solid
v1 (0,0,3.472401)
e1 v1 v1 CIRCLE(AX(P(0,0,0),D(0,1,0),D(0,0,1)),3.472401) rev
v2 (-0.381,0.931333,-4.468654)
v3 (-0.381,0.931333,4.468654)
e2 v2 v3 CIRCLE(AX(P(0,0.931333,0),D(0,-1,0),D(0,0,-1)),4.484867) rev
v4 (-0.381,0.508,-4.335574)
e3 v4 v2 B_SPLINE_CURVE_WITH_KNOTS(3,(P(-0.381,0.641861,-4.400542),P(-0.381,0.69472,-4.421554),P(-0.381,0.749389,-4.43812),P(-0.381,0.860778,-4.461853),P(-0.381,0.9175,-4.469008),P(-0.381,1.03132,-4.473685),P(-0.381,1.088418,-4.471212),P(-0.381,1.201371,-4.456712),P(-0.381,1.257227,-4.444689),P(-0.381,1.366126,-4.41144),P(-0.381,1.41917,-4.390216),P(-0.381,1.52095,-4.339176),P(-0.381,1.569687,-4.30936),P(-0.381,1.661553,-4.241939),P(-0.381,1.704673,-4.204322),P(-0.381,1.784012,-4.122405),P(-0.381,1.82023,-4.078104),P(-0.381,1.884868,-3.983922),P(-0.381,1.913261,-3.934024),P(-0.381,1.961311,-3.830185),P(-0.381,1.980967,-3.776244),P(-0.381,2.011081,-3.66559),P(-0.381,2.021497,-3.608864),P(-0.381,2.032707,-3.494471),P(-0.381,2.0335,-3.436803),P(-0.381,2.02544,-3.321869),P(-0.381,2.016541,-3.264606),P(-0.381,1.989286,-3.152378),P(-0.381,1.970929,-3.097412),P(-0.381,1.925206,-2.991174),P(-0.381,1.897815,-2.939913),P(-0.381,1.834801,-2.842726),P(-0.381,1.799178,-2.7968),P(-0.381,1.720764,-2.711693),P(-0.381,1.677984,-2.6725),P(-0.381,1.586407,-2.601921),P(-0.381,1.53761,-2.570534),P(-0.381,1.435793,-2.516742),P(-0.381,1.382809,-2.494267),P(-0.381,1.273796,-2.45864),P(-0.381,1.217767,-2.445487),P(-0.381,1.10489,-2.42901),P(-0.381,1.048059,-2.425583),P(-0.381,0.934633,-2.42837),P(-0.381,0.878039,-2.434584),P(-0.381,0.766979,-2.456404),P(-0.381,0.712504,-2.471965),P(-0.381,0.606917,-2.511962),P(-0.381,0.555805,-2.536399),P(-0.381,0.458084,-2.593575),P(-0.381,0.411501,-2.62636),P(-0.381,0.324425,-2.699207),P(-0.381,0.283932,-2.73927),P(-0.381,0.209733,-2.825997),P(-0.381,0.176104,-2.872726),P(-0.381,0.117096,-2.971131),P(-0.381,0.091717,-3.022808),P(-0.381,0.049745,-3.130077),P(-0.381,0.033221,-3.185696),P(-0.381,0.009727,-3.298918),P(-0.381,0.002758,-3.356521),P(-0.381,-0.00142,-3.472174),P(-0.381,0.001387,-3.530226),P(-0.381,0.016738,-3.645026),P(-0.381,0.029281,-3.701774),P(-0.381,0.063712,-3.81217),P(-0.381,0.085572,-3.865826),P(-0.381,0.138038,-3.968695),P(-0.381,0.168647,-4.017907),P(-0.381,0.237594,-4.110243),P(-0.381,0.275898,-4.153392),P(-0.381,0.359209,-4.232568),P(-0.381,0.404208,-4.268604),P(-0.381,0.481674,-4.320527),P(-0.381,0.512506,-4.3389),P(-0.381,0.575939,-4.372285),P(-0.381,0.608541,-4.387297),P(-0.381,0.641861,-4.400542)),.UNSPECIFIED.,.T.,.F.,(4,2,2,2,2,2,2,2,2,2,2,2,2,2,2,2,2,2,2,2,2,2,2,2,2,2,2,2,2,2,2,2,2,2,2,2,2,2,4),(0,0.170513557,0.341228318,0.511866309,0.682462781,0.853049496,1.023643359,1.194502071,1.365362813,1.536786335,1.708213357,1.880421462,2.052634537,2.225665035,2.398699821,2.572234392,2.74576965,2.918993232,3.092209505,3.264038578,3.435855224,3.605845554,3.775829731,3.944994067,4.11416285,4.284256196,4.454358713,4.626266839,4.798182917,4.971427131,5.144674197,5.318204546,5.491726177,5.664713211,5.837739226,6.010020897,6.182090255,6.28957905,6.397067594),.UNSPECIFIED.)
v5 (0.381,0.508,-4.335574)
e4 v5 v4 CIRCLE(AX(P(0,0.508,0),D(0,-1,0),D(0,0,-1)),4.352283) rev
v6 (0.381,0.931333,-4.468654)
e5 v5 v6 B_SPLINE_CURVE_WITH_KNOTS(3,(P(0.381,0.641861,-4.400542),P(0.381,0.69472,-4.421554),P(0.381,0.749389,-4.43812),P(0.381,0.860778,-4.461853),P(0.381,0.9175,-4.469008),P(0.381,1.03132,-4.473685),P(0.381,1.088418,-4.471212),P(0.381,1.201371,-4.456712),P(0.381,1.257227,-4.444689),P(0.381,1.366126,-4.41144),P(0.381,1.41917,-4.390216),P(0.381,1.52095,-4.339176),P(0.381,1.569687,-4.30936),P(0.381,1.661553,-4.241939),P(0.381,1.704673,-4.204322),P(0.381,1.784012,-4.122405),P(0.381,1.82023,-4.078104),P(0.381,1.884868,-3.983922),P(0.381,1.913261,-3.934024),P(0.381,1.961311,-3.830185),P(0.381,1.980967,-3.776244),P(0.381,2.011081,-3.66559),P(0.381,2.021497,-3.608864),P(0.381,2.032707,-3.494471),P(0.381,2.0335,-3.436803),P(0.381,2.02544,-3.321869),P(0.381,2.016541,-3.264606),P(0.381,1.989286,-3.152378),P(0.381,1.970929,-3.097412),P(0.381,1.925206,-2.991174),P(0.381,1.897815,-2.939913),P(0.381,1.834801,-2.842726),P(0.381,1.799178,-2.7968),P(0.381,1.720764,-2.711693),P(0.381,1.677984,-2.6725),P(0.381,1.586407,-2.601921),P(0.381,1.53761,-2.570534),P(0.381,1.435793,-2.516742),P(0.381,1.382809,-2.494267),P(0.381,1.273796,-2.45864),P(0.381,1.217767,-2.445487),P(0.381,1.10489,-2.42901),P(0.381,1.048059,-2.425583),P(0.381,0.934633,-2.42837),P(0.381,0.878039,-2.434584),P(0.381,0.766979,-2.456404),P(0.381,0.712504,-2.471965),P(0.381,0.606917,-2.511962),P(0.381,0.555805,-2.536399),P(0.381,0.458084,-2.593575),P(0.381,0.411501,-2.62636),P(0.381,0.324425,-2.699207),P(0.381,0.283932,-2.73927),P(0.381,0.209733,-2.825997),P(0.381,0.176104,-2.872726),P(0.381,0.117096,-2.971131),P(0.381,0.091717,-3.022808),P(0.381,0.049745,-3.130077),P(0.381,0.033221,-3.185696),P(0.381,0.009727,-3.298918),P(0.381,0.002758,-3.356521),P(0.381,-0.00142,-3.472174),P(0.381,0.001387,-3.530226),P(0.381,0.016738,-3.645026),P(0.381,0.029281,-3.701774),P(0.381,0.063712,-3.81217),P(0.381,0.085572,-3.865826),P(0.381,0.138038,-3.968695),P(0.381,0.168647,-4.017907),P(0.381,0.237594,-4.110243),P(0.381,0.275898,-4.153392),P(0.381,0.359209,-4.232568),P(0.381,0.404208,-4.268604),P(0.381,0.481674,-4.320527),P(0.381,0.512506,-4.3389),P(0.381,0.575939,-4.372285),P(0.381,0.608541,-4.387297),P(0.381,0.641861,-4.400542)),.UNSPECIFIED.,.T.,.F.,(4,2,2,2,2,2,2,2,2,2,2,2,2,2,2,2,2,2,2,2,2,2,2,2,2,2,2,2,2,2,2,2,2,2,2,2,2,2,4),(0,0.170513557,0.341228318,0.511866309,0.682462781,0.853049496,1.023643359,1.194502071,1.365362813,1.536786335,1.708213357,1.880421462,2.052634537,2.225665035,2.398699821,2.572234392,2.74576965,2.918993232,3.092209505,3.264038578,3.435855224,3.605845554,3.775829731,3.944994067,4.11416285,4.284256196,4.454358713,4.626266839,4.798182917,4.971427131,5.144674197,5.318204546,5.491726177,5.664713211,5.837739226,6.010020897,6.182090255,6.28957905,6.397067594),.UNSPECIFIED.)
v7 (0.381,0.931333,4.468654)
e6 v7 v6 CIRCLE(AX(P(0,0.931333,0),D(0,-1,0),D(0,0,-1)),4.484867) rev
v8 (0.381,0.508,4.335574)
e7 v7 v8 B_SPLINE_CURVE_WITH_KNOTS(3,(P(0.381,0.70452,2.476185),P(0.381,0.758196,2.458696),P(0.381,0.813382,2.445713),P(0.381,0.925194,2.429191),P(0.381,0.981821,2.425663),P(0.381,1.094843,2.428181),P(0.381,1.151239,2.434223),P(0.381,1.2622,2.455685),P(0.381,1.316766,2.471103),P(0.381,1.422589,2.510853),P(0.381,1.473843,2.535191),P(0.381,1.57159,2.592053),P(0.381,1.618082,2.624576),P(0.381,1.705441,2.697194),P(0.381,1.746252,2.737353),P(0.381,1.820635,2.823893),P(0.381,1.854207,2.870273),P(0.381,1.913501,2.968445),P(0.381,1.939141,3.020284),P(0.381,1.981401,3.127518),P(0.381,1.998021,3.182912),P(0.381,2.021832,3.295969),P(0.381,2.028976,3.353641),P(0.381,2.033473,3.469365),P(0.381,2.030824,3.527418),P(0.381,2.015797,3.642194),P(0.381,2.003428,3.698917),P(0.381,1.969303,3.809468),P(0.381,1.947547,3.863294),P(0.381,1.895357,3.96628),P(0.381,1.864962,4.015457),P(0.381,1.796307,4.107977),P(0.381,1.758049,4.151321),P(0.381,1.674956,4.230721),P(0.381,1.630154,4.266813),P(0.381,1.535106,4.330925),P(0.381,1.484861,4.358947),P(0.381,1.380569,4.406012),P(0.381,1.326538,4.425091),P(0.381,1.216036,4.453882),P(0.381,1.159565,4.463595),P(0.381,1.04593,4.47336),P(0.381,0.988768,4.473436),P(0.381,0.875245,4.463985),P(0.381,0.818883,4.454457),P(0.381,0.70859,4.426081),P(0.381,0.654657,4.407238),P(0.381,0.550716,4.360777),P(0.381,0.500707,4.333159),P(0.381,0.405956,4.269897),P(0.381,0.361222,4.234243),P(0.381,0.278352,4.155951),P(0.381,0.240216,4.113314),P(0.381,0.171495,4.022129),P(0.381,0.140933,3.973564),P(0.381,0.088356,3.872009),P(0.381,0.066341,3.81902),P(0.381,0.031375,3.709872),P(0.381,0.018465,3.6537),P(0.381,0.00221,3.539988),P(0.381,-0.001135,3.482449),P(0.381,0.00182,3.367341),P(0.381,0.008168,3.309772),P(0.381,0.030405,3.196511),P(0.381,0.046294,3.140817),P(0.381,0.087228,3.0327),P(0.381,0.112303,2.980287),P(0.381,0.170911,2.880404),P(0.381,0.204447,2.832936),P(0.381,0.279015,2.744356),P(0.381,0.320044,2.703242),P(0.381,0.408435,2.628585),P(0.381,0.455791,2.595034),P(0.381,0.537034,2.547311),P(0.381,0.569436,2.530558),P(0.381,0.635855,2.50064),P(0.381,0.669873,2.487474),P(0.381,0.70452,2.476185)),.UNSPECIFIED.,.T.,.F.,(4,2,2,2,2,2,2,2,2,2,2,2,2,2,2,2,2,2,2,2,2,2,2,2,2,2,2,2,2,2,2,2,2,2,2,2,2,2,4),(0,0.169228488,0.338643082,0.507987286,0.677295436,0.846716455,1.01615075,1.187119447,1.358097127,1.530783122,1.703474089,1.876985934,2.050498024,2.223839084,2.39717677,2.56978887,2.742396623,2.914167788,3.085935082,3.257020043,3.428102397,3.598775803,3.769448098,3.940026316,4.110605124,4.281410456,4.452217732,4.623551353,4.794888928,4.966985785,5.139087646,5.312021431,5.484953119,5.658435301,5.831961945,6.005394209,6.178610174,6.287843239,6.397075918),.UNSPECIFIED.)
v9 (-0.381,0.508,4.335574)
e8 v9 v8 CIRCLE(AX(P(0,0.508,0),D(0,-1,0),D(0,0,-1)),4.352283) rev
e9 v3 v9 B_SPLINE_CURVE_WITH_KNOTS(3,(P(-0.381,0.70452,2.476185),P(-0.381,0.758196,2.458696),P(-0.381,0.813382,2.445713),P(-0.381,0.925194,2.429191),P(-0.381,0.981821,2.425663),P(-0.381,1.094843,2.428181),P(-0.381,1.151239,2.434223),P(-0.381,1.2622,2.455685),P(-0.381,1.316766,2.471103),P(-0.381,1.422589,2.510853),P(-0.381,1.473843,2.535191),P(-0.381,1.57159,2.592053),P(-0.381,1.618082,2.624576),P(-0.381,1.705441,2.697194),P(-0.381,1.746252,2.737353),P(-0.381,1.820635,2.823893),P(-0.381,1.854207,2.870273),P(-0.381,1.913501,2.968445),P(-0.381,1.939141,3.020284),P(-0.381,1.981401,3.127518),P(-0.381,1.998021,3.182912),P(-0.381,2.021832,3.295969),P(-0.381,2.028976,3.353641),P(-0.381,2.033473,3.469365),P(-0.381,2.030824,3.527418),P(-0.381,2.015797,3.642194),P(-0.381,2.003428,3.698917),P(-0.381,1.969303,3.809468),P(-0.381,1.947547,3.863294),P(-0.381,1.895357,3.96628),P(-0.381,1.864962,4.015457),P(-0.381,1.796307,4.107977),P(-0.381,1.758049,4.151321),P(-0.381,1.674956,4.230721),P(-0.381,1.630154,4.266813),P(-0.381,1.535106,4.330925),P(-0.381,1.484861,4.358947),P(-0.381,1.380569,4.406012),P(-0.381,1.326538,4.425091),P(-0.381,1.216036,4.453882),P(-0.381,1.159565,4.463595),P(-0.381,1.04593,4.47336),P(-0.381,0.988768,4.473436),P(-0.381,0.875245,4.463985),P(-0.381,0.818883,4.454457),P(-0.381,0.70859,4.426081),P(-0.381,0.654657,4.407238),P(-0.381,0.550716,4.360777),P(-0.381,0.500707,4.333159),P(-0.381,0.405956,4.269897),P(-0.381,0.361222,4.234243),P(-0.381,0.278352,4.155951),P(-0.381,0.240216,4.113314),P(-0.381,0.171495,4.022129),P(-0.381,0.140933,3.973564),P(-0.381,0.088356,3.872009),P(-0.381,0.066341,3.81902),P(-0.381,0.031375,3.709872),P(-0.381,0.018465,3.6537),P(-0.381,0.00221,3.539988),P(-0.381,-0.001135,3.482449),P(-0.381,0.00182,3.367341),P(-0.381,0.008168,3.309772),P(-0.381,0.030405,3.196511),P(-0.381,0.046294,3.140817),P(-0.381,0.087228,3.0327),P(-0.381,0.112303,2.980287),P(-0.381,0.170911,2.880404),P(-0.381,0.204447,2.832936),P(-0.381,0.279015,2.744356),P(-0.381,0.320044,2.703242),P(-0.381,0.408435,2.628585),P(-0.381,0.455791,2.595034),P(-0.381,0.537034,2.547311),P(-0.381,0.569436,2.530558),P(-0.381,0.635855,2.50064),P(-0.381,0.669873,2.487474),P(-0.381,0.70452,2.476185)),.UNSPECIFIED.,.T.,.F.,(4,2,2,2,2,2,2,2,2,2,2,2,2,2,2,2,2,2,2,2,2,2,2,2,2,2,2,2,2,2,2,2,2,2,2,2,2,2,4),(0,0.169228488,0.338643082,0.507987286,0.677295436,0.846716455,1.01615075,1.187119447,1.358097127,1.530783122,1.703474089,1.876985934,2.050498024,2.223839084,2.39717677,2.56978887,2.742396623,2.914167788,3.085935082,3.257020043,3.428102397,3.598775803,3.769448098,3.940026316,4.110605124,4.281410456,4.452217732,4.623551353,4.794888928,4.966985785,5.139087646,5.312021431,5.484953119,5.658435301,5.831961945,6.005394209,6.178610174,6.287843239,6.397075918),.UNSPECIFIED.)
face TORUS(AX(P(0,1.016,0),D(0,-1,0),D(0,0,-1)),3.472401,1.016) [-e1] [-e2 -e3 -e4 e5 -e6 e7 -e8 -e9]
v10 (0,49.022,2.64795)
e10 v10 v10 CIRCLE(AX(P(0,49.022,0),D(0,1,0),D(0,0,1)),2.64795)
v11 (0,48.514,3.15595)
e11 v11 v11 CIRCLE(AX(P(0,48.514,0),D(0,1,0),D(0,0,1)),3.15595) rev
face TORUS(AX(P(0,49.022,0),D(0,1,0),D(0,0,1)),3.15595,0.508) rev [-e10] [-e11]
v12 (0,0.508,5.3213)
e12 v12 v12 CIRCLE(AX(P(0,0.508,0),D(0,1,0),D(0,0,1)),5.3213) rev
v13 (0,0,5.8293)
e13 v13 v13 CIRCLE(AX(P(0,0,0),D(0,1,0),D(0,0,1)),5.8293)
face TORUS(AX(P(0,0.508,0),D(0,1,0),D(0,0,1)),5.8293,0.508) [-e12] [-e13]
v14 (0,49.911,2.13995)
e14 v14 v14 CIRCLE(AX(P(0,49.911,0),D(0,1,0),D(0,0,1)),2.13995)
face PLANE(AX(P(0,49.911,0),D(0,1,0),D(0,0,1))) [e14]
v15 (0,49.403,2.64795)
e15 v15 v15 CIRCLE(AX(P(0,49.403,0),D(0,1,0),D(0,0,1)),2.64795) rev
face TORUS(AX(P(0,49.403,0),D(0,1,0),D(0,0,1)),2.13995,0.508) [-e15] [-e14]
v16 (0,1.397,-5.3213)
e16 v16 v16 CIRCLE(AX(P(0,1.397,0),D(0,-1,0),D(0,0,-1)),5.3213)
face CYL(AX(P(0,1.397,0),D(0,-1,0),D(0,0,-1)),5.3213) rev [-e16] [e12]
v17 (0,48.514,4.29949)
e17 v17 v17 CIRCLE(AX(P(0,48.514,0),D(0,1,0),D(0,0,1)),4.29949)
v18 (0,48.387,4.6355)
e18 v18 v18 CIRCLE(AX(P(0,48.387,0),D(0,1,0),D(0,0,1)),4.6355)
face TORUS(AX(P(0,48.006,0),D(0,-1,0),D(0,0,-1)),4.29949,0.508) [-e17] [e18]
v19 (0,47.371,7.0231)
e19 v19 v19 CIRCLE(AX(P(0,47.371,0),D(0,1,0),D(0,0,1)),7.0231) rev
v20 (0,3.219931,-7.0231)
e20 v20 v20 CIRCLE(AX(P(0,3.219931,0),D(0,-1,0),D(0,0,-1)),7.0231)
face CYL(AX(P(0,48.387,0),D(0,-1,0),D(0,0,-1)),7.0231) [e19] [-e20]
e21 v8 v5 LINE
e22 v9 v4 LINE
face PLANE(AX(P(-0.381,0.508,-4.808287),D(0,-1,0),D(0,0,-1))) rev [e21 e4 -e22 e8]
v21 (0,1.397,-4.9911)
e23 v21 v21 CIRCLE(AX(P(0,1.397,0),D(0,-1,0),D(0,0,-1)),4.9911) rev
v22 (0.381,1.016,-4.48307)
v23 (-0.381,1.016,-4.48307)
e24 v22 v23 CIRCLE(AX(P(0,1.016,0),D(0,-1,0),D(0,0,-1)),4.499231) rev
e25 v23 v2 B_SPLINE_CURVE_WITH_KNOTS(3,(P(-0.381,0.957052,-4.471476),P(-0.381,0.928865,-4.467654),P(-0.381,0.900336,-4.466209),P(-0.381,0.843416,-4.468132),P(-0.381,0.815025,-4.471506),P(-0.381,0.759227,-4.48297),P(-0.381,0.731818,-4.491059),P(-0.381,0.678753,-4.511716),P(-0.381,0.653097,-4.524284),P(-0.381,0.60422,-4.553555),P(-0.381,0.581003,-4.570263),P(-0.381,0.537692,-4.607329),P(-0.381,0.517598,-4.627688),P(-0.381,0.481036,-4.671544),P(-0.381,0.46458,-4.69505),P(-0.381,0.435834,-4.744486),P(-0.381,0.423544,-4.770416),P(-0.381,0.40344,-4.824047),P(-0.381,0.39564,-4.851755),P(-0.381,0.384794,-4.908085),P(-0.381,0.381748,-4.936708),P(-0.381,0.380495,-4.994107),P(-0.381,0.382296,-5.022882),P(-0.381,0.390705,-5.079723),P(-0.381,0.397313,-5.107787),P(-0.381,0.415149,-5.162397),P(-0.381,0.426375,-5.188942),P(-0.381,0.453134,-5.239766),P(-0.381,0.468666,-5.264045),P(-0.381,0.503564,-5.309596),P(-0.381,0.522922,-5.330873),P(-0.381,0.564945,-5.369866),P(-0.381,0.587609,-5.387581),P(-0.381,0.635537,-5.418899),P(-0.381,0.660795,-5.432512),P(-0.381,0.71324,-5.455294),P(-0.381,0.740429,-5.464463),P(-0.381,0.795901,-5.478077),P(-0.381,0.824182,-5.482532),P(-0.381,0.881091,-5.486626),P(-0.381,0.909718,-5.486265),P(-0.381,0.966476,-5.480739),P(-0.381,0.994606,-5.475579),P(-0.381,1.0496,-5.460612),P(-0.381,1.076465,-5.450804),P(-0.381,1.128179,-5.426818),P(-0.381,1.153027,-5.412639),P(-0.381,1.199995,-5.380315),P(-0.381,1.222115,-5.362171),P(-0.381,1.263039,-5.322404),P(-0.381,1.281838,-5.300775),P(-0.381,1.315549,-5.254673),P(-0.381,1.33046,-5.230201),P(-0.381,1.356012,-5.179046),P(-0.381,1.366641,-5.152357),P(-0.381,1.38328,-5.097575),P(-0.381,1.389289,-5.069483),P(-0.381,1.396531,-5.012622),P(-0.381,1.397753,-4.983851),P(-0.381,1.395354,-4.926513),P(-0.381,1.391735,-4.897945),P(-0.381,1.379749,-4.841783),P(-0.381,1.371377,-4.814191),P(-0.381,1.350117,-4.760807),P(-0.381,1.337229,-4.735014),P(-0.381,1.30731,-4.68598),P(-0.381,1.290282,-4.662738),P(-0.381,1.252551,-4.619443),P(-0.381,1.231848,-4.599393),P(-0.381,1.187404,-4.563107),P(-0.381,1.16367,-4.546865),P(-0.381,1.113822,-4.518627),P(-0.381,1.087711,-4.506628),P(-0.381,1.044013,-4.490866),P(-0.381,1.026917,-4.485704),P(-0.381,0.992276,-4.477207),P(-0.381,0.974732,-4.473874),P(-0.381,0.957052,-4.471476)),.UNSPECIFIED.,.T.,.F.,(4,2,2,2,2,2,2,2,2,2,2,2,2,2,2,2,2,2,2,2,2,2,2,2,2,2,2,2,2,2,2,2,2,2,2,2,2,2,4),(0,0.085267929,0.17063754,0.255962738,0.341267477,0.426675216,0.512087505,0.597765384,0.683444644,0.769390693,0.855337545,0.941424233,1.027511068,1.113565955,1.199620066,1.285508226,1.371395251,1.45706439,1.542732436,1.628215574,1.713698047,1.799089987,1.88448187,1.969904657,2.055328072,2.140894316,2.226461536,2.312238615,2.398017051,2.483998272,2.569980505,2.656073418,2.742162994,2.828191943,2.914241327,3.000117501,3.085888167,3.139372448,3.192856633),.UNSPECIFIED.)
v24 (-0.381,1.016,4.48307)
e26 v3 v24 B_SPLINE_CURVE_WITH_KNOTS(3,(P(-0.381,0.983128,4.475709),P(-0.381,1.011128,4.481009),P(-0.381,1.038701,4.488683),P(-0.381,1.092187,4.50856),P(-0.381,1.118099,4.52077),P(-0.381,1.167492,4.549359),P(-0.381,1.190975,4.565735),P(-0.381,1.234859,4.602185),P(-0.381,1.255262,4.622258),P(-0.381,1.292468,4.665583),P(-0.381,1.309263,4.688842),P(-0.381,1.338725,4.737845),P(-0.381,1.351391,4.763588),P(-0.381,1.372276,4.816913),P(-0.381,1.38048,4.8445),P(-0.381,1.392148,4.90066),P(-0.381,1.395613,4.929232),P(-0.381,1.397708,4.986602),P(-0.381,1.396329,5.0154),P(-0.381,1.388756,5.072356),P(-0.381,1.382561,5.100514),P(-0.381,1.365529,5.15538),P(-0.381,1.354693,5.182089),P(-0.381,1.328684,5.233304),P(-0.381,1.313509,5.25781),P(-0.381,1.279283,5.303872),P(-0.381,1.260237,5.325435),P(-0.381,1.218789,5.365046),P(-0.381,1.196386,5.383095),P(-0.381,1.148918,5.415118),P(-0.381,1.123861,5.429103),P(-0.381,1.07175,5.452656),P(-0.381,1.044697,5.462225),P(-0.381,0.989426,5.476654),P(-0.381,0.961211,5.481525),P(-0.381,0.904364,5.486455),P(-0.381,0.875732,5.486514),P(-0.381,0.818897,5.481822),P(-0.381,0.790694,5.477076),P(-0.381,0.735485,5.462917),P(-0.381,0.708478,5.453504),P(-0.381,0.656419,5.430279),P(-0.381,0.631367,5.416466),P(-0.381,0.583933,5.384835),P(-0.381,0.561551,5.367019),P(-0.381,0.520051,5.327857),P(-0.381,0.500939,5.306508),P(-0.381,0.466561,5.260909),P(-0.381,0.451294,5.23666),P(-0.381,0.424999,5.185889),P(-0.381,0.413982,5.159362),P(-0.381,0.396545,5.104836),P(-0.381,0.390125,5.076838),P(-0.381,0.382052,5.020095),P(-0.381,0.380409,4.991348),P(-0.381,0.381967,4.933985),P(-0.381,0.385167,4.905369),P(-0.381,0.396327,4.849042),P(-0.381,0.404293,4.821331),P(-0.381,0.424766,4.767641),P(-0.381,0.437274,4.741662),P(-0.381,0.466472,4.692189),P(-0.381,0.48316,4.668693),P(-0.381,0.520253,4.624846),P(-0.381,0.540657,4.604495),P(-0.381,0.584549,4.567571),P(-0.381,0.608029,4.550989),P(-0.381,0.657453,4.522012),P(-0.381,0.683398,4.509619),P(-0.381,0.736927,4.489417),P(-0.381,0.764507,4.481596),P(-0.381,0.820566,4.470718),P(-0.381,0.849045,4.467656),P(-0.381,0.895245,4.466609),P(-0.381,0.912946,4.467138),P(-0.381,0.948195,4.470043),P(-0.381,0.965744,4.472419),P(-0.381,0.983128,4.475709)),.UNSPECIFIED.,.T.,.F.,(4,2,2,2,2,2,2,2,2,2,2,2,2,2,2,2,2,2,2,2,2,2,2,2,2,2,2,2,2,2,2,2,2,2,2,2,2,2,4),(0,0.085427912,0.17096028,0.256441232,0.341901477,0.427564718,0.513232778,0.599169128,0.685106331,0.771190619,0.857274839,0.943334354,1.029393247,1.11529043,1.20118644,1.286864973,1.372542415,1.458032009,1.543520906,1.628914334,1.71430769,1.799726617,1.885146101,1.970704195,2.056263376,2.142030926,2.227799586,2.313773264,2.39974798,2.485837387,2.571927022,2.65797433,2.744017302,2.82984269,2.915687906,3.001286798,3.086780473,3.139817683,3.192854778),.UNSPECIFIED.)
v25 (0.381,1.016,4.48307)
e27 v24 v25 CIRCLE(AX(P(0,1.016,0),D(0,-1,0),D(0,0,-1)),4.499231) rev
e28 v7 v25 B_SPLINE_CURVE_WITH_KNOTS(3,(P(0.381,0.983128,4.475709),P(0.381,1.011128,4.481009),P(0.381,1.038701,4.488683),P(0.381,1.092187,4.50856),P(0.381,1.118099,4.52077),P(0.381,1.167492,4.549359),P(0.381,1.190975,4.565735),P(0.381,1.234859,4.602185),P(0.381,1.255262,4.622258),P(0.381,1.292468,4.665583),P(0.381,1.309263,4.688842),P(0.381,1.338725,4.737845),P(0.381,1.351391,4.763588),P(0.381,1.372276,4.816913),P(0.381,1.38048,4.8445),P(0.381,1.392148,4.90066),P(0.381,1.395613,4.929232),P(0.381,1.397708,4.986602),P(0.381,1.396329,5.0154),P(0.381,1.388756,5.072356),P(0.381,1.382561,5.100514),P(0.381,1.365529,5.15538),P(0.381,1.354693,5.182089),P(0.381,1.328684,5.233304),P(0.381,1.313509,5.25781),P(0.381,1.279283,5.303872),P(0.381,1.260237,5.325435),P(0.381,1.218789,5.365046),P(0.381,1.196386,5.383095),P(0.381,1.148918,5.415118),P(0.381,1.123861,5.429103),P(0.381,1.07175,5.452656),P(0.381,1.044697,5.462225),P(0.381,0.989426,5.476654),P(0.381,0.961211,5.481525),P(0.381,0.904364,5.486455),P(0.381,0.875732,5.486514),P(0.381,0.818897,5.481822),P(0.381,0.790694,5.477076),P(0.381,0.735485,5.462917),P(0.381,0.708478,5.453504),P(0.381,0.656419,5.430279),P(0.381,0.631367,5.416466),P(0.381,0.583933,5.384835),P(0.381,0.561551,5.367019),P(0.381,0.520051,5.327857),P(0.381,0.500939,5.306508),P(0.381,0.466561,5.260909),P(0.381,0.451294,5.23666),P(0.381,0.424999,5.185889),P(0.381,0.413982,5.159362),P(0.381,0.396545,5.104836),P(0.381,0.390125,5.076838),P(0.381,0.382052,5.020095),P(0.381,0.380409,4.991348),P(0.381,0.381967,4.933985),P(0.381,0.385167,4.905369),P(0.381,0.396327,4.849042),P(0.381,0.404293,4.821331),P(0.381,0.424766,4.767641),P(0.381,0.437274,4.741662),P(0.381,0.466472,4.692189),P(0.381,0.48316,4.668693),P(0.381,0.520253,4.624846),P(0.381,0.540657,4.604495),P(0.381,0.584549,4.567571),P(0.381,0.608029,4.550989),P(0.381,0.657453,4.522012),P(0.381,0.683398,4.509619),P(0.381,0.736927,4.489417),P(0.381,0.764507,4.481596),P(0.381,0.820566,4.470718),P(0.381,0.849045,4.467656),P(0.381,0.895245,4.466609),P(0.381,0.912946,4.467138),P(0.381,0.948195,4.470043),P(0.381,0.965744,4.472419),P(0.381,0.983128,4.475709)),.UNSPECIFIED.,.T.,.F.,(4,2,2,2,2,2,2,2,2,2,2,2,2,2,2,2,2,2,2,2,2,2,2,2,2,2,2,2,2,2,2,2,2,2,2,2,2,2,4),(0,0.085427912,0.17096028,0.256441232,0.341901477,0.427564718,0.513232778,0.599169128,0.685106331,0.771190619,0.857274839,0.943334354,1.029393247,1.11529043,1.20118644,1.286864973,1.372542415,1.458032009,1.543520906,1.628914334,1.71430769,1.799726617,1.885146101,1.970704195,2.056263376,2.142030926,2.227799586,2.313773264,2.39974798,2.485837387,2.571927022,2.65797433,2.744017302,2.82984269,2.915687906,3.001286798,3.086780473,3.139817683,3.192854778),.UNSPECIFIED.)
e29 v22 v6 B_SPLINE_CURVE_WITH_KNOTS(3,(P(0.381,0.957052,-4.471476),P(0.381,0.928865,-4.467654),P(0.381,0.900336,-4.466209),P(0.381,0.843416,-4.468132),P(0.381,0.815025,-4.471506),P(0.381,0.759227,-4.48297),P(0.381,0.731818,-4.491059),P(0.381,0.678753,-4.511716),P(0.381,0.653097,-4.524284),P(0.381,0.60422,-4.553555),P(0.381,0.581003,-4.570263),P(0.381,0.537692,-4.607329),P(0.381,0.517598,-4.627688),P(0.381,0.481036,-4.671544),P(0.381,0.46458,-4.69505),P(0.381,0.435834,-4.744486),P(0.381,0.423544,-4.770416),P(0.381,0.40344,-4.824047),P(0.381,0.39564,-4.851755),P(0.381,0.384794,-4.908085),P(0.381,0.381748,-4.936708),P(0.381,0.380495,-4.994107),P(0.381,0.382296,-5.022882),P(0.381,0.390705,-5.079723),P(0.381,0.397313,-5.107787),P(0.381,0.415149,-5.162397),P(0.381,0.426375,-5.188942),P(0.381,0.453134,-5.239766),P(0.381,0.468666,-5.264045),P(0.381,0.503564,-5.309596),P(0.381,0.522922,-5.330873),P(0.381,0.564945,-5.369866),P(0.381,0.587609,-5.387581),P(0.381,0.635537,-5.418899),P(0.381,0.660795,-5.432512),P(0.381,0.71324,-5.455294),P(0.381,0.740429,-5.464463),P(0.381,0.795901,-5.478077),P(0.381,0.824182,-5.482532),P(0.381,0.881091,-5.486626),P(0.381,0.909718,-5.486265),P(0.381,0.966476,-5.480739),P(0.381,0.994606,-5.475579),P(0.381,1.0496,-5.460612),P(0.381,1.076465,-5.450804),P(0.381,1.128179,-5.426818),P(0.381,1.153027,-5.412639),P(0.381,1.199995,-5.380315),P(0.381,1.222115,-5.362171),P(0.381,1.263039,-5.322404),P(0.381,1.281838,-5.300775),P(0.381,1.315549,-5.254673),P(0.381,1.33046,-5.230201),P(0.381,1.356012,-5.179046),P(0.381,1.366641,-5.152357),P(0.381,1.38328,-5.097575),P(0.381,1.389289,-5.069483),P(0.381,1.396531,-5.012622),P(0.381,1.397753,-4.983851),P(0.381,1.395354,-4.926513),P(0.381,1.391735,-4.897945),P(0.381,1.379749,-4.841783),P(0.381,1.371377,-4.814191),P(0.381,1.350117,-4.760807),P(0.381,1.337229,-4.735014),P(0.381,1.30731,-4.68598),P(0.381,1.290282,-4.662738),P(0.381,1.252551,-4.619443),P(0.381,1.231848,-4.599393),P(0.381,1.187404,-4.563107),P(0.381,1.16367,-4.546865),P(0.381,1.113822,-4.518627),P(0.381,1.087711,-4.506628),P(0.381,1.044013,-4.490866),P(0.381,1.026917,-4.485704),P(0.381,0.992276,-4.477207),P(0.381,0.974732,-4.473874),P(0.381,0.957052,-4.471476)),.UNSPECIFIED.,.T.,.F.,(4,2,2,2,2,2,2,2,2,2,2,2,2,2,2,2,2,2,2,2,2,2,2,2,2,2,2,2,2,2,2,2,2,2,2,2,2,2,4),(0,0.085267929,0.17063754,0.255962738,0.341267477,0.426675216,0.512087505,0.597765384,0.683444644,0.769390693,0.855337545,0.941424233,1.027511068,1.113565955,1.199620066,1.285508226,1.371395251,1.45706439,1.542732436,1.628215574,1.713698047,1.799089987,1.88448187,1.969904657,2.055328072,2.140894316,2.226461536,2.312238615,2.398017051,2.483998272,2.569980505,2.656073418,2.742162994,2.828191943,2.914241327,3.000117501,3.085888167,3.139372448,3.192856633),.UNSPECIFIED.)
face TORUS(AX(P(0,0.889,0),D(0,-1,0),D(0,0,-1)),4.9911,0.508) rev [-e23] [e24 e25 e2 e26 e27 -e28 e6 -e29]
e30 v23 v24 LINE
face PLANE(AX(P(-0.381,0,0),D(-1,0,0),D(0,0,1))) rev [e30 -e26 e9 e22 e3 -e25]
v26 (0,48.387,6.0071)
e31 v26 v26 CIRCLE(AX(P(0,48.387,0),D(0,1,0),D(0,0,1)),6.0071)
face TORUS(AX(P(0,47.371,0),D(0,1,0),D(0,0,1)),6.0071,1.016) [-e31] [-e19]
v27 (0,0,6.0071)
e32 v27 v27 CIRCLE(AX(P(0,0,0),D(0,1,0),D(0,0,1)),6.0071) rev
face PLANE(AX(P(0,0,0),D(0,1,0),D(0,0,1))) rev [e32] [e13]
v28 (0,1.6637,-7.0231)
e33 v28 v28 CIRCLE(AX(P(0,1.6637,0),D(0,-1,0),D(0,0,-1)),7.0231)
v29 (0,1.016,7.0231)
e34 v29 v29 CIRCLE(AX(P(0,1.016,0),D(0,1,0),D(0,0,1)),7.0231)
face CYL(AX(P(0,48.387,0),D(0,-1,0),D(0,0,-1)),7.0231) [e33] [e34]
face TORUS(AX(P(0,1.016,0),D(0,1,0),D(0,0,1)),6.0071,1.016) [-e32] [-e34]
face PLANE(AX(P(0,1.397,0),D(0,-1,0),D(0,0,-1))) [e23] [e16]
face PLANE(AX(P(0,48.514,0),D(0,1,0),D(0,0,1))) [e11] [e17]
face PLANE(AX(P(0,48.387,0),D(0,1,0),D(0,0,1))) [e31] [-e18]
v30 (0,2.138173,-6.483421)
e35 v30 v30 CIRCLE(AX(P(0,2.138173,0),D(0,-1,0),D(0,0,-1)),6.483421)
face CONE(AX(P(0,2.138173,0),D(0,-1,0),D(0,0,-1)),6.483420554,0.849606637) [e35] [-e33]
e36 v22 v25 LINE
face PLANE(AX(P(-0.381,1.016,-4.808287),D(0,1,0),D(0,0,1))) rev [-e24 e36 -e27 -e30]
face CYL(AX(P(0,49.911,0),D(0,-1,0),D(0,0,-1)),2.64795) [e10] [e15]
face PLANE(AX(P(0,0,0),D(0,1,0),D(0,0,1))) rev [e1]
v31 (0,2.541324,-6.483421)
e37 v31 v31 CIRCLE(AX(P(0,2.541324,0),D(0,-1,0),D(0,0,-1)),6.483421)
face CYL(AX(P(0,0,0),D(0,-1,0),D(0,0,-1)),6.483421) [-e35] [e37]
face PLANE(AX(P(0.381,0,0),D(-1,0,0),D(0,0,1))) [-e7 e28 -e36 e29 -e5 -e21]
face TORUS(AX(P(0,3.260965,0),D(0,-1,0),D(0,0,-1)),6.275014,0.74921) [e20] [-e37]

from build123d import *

# Parameters (mm, degrees)
SKETCH1_R           = 7.0231
BOSS_EXTRUDE1_DEPTH = 48.387
FILLET1_R           = 1.016
SKETCH3_R           = 4.6355
BOSS_EXTRUDE2_DEPTH = 0.127
FILLET2_R           = 0.508
SKETCH4_R           = 2.64795
BOSS_EXTRUDE3_DEPTH = 1.397
FILLET3_R           = 0.508
SKETCH6_R           = 5.3213
SKETCH6_R_2         = 4.4831
CUT_EXTRUDE1_DEPTH  = 1.397
FILLET4_R           = 0.508
FILLET5_R           = 0.508
FILLET6_R           = 1.016
SKETCH7_W           = 9.793083482
SKETCH7_H           = 0.508
CUT_EXTRUDE2_DEPTH  = 0.381


with BuildPart() as part:
    # Sketch1 → Boss-Extrude1 (new body)
    with BuildSketch(Plane(origin=(0, 0, 0), x_dir=(1, 0, 0), z_dir=(0, 1, 0))):
        with Locations(Location((0, 0, 0), (0, 0, 270))):
            Circle(SKETCH1_R)
    extrude(amount=BOSS_EXTRUDE1_DEPTH)

    # Fillet1
    fillet1_edges = [part.edges().sort_by_distance(p)[0] for p in [
        (0, 0, -7.0231),
        (0, 48.387, -7.0231),
    ]]
    fillet(fillet1_edges, radius=FILLET1_R)

    # Sketch3 → Boss-Extrude2 (add)
    with BuildSketch(Plane(origin=(0, 48.387, 0), x_dir=(1, 0, 0), z_dir=(0, 1, 0))):
        with Locations(Location((0, 0, 0), (0, 0, 270))):
            Circle(SKETCH3_R)
    extrude(amount=BOSS_EXTRUDE2_DEPTH)

    # Fillet2
    # the kernel refuses this fillet: 0.508 mm, written as the material it takes off along each edge
    with BuildSketch(Plane(origin=(0, 48.514, 0), x_dir=(0, 0, 1), z_dir=(-1, 0, 0))) as fillet2_piece_1:
        with BuildLine():
            CenterArc((4.299489583, -0.508), FILLET2_R, 48.590377891, 41.409622109)
            Line((4.299489583, 0), (4.299489583, 0.01016))
            Line((4.299489583, 0.01016), (4.6355, 0.01016))
            Line((4.6355, 0.01016), (4.64566, 0))
            ThreePointArc((4.64566, 0), (4.64566, -0.0635), (4.642220208, -0.11938))
            Line((4.642220208, -0.11938), (4.6355, -0.127))
        make_face()
    revolve(axis=Axis((0, 48.514, 0), (0, 1, 0)), mode=Mode.SUBTRACT)

    # Sketch4 → Boss-Extrude3 (add)
    with BuildSketch(Plane(origin=(0, 48.514, 0), x_dir=(1, 0, 0), z_dir=(0, 1, 0))):
        with Locations(Location((0, 0, 0), (0, 0, 270))):
            Circle(SKETCH4_R)
    extrude(amount=BOSS_EXTRUDE3_DEPTH)

    # Fillet3
    fillet3_edges = [part.edges().sort_by_distance(p)[0] for p in [
        (0, 48.514, -2.64795),
        (0, 49.911, -2.64795),
    ]]
    fillet(fillet3_edges, radius=FILLET3_R)

    # Sketch5 → Cut-Revolve2 (revolve, cut)
    with BuildSketch(Plane(origin=(0, 0, 0), x_dir=(0, 0, -1), z_dir=(1, 0, 0))):
        with BuildLine():
            ThreePointArc((7.0231, 3.219930603), (6.861397944, 2.794628212), (6.483420554, 2.541324497))
            Line((6.483420554, 2.541324497), (6.483420554, 2.138172653))
            Line((6.483420554, 2.138172653), (7.0231, 1.6637))
            Line((7.0231, 1.6637), (7.0231, 3.219930603))
        make_face()
    revolve(axis=Axis((0, 0, 0), (0, 1, 0)), mode=Mode.SUBTRACT)

    # Sketch6 → Cut-Extrude1 (cut)
    with BuildSketch(Plane.XZ):
        with Locations(Location((0, 0, 0), (0, 0, 270))):
            Circle(SKETCH6_R)
        with Locations(Location((0, 0, 0), (0, 0, 270))):
            Circle(SKETCH6_R_2, mode=Mode.SUBTRACT)
    extrude(amount=-CUT_EXTRUDE1_DEPTH, mode=Mode.SUBTRACT)

    # Fillet4
    fillet4_edges = [part.edges().sort_by_distance(p)[0] for p in [
        (0, 0, 5.3213),
    ]]
    fillet(fillet4_edges, radius=FILLET4_R)

    # Fillet5
    fillet5_edges = [part.edges().sort_by_distance(p)[0] for p in [
        (0, 1.397, 4.4831),
    ]]
    fillet(fillet5_edges, radius=FILLET5_R)

    # Fillet6
    fillet6_edges = [part.edges().sort_by_distance(p)[0] for p in [
        (0, 0, 4.4831),
    ]]
    fillet(fillet6_edges, radius=FILLET6_R)

    # Sketch7 → Cut-Extrude2 (cut, symmetric)
    with BuildSketch(Plane(origin=(0, 0, 0), x_dir=(0, 0, -1), z_dir=(1, 0, 0))):
        with Locations((-0.088254773, 0.762)):
            Rectangle(SKETCH7_W, SKETCH7_H)
    extrude(amount=CUT_EXTRUDE2_DEPTH, both=True, mode=Mode.SUBTRACT)


solid = part.part
